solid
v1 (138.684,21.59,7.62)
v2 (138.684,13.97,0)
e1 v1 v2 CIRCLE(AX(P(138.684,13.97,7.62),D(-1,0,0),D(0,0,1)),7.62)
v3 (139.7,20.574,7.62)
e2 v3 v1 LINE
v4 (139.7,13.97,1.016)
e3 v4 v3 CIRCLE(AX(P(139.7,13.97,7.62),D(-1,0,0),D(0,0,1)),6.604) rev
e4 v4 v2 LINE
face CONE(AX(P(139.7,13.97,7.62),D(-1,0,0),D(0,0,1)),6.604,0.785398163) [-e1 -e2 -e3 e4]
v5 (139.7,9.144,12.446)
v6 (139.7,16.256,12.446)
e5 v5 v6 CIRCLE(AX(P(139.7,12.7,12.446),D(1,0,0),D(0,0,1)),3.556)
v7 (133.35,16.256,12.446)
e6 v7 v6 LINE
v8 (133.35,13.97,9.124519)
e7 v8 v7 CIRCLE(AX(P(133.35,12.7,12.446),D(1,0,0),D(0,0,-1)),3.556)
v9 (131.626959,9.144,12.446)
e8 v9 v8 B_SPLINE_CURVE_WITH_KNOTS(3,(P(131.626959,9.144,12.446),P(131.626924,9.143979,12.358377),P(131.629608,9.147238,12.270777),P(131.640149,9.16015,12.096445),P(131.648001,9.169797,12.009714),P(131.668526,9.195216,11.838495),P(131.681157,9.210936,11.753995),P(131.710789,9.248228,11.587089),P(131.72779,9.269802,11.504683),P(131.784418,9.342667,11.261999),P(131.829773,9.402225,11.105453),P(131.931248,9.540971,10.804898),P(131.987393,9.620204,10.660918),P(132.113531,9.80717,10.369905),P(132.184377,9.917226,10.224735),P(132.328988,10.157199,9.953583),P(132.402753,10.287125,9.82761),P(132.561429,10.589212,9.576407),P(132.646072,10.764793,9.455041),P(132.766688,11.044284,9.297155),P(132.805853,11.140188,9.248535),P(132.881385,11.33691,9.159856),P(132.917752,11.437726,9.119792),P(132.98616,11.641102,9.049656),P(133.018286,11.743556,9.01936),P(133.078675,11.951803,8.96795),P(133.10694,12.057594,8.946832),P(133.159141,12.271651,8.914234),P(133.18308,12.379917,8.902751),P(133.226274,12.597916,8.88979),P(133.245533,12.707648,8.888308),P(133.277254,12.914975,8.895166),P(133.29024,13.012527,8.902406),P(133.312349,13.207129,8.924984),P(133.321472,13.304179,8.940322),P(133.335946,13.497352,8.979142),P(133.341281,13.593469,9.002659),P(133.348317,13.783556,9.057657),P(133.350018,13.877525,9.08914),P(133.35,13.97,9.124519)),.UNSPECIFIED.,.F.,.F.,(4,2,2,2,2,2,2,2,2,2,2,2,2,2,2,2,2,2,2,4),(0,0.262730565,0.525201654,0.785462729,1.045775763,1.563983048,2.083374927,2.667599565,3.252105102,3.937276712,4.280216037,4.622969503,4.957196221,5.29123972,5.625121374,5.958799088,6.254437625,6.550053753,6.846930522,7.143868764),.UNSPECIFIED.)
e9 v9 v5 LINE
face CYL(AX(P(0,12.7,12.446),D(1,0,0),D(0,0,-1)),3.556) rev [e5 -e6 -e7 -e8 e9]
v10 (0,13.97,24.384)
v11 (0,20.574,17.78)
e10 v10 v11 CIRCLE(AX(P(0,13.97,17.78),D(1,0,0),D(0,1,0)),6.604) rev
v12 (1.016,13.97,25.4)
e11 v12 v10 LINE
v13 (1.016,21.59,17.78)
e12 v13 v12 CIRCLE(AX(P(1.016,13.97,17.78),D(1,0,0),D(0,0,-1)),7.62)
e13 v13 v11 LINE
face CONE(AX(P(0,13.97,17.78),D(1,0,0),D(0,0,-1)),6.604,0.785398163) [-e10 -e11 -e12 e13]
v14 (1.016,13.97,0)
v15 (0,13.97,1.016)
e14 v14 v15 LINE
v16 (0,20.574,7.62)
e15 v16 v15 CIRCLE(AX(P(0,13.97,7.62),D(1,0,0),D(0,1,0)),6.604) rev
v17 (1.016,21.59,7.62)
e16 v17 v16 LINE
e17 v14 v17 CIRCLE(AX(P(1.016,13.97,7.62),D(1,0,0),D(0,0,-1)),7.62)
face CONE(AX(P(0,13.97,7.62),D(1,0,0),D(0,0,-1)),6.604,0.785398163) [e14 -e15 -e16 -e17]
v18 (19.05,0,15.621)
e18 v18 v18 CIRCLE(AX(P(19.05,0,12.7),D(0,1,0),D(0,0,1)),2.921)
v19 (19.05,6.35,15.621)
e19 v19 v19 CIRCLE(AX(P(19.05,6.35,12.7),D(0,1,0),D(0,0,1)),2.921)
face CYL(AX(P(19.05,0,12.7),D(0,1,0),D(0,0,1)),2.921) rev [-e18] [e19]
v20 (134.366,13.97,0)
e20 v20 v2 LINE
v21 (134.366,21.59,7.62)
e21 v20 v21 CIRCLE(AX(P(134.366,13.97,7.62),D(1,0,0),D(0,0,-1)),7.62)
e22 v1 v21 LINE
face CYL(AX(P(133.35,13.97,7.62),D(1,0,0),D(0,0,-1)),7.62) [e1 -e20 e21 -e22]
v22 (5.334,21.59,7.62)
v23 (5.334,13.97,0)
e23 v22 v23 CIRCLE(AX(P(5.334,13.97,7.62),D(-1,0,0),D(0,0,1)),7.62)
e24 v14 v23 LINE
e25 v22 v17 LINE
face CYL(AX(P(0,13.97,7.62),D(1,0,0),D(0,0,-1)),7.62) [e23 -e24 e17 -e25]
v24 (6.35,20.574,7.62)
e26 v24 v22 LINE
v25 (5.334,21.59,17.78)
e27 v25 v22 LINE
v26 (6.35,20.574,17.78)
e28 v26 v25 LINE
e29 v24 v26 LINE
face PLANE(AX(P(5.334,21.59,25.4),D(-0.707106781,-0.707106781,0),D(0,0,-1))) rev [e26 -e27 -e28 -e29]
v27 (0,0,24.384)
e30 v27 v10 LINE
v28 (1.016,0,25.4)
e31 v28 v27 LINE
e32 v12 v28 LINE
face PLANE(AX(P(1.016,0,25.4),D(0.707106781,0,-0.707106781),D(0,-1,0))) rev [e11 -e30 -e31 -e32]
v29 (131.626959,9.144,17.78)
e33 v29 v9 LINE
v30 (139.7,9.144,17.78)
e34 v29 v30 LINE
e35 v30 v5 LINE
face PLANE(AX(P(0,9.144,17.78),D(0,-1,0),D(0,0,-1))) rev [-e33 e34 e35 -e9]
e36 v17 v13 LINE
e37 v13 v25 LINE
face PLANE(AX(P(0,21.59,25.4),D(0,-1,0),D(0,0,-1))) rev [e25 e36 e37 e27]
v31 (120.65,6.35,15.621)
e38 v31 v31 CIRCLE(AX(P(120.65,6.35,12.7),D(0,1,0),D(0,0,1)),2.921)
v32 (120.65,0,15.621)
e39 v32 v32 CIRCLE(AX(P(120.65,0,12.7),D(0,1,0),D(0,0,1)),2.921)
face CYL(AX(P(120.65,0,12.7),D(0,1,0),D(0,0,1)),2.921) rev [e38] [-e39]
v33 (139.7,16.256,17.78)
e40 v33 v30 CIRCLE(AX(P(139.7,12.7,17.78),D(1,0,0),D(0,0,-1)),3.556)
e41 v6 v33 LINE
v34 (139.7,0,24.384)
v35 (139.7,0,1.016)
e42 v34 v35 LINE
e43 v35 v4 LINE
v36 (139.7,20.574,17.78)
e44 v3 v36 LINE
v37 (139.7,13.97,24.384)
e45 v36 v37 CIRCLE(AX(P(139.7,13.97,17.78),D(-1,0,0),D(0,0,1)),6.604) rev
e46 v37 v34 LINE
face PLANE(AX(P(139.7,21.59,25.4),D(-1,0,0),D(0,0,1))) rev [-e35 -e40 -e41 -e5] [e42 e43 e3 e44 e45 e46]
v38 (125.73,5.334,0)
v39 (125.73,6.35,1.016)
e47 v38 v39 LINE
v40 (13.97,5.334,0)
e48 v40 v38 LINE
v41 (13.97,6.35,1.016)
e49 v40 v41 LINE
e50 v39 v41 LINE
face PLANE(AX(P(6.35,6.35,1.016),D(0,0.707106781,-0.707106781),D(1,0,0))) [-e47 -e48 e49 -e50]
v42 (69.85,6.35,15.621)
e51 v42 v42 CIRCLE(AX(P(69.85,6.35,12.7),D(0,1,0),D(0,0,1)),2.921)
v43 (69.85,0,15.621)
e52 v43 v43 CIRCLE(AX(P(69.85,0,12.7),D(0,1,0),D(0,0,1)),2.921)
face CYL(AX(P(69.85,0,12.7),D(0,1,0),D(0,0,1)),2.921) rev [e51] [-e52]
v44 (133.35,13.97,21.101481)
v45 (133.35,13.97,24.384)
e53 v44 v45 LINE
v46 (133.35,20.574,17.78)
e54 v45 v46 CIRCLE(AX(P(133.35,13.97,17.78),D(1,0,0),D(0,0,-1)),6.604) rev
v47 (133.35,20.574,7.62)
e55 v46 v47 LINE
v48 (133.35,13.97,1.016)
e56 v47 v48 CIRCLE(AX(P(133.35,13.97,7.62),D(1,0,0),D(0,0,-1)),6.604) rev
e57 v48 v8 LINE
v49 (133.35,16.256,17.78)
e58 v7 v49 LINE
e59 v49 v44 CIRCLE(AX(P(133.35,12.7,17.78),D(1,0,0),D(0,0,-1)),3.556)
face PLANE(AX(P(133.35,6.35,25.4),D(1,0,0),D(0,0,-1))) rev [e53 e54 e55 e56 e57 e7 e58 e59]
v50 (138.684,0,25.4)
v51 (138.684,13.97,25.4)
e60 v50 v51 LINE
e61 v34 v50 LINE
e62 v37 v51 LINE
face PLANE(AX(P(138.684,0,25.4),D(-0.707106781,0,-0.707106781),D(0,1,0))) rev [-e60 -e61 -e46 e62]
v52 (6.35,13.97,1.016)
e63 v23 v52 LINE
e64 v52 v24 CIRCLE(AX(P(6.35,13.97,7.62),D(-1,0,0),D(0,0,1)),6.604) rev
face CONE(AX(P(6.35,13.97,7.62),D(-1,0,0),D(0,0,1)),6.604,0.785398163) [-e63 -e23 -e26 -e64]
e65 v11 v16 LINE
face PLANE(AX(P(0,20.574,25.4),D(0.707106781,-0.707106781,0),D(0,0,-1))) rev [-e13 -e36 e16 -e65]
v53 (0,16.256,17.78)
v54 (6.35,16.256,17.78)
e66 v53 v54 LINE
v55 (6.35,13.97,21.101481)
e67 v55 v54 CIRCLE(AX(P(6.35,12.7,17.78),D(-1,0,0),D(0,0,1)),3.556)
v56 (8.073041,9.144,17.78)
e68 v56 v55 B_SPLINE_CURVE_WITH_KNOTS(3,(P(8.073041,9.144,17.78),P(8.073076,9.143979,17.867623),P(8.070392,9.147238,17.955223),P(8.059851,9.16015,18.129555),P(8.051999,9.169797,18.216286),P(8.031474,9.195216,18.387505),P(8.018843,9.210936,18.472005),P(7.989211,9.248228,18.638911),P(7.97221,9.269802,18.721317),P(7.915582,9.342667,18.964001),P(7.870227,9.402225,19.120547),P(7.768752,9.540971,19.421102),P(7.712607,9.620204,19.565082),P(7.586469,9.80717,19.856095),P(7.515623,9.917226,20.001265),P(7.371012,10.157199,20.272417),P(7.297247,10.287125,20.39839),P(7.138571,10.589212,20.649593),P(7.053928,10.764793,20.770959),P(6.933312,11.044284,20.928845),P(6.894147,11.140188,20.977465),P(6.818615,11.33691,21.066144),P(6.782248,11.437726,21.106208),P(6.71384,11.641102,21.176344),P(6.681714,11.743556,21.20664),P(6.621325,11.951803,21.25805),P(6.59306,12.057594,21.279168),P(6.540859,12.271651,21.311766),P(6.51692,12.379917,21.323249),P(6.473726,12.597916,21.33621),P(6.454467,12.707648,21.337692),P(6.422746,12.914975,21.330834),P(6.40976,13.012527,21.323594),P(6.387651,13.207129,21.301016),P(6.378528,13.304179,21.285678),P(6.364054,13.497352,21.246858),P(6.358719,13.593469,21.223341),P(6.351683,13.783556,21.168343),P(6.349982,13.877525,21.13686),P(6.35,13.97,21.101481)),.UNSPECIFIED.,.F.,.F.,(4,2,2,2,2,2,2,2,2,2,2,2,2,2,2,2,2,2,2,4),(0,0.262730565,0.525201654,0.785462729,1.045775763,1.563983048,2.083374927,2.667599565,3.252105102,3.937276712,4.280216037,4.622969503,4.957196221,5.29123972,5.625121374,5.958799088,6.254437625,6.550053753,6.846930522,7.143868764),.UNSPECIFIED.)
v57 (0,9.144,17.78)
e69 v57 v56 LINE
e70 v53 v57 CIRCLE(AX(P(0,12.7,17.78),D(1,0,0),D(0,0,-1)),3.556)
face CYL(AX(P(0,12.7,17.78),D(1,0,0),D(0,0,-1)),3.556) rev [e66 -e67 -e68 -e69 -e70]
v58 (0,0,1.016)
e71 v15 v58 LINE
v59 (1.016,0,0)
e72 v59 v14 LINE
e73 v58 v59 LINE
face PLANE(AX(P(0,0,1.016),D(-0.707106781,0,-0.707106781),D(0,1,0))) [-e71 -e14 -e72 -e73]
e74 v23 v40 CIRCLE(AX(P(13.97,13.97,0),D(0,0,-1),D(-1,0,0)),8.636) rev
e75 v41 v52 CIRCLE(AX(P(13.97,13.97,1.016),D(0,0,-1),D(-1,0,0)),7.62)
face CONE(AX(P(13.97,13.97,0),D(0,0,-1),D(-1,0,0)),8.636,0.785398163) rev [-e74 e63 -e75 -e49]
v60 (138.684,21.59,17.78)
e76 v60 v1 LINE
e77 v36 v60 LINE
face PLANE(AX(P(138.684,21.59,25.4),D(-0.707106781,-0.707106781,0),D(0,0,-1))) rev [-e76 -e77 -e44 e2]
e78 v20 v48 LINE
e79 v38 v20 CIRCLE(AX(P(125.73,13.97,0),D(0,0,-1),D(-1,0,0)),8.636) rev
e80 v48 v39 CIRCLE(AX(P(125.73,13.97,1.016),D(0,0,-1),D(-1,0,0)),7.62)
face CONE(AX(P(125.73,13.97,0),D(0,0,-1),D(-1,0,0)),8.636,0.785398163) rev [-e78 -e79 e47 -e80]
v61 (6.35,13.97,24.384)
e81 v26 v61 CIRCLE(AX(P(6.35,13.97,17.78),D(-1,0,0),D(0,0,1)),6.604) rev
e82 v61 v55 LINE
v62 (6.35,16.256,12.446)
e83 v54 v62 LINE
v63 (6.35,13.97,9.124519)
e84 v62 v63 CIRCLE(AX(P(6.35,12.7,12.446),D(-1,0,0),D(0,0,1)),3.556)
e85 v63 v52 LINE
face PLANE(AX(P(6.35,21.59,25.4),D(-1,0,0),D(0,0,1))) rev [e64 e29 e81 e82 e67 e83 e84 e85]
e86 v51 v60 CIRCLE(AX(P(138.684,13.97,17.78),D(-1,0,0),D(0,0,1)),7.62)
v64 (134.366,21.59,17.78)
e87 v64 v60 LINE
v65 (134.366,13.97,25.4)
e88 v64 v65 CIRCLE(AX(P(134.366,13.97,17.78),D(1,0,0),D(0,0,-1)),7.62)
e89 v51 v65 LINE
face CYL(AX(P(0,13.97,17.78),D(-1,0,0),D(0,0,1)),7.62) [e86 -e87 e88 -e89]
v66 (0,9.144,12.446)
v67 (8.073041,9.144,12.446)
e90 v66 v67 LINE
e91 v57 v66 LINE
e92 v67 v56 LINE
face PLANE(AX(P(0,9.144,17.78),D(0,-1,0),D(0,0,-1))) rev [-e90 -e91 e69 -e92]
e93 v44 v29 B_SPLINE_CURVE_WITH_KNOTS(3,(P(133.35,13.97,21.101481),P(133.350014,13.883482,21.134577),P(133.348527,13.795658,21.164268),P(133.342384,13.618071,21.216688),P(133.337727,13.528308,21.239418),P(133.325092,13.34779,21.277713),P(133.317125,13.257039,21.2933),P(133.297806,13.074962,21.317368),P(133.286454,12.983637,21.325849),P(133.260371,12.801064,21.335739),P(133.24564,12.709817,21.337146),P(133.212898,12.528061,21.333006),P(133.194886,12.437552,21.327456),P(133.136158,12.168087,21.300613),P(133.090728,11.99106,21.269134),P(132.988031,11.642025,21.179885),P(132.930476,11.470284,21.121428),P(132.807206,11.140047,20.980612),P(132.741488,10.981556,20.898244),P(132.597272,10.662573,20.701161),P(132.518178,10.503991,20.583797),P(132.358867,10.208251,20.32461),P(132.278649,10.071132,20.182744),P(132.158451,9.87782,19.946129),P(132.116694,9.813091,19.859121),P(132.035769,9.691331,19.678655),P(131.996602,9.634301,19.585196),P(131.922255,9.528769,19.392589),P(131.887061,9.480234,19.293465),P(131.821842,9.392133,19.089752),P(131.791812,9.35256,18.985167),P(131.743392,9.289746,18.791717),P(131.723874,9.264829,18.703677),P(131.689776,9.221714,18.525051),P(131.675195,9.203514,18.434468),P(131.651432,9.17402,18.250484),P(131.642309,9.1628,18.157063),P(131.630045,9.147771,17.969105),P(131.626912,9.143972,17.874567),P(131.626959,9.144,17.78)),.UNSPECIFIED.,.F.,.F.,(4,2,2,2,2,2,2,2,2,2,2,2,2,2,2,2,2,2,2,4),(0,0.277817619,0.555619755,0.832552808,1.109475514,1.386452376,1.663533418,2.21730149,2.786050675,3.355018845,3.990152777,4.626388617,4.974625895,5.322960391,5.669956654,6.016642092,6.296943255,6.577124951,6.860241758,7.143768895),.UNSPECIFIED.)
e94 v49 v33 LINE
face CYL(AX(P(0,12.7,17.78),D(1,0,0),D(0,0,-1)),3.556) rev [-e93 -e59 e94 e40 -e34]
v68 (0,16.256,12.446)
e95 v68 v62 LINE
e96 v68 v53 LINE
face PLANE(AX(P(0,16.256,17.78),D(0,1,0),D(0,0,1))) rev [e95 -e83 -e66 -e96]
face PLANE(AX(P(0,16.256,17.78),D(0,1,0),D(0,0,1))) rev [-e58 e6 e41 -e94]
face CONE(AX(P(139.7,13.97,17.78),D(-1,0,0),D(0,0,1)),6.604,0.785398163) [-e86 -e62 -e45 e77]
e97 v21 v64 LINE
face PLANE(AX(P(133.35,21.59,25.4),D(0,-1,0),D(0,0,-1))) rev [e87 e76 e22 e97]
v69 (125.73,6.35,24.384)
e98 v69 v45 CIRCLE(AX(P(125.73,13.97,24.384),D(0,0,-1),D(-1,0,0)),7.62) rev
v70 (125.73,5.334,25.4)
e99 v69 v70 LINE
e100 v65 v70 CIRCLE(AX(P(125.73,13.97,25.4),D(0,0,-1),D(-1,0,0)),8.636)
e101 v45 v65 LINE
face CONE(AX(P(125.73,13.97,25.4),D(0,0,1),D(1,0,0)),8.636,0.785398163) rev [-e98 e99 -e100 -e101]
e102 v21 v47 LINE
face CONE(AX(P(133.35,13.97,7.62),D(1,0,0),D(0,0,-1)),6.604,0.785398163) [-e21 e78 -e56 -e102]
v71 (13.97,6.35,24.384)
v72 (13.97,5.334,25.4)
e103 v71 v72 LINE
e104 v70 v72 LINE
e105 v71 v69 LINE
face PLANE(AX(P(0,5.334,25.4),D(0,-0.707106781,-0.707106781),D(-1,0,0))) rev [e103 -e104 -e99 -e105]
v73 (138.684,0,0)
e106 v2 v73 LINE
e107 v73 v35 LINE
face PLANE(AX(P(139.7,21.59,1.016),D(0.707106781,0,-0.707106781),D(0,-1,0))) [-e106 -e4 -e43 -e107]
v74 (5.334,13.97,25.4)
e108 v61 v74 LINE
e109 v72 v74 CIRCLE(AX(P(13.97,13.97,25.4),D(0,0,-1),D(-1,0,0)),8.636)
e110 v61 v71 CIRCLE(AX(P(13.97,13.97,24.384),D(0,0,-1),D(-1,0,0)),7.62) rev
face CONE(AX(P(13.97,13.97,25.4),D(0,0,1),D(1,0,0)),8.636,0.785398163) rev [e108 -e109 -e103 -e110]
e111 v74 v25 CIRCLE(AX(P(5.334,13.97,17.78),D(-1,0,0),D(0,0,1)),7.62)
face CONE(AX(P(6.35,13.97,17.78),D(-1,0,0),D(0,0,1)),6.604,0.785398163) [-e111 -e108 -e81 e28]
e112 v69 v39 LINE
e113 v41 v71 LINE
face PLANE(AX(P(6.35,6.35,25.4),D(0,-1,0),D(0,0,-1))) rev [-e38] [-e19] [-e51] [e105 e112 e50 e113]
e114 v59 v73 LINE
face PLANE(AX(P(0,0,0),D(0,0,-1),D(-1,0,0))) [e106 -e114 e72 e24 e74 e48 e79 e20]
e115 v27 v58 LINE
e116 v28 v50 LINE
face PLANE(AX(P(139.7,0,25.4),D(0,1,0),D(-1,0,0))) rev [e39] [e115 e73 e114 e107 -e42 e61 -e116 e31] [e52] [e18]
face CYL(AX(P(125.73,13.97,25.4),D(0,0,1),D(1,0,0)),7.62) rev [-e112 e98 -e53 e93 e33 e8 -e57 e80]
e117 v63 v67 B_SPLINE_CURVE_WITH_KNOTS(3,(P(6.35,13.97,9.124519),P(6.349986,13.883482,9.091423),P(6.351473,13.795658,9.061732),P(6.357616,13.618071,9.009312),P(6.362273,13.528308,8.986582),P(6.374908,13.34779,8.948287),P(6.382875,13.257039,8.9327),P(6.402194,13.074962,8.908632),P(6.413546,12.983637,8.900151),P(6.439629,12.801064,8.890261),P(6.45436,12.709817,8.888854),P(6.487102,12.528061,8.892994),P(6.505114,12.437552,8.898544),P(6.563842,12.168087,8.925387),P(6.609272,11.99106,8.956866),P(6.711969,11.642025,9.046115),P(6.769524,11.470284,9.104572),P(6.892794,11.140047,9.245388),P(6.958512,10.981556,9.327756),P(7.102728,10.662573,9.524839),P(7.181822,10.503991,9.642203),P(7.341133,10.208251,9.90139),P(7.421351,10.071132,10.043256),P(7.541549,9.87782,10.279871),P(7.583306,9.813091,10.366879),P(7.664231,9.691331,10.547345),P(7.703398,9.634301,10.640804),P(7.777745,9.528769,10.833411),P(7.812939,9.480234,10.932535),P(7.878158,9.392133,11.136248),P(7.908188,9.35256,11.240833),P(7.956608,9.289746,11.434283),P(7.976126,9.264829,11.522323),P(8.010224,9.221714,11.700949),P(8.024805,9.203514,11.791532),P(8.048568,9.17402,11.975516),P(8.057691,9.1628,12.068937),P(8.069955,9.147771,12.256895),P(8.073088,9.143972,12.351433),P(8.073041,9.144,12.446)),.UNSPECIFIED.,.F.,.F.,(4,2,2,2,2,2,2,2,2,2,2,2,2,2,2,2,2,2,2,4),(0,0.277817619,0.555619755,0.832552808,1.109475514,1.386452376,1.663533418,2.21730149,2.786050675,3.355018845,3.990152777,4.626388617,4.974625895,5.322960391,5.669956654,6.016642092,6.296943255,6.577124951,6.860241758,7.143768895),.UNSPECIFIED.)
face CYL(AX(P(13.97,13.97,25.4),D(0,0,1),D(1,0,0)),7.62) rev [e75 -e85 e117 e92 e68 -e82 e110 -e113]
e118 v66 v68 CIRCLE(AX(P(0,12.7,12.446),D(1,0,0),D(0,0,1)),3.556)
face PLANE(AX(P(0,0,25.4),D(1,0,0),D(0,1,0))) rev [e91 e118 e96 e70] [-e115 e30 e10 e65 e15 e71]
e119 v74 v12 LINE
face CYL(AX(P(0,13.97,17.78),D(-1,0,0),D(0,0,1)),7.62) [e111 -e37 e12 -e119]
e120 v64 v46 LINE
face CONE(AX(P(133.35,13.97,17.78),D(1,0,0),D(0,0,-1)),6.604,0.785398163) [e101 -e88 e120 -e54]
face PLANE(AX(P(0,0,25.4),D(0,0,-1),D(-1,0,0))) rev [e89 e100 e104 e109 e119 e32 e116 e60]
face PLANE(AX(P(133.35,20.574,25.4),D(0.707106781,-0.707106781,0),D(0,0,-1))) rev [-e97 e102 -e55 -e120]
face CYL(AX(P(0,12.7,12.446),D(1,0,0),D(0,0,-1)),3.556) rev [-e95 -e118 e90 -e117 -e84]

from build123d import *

# Parameters (mm, degrees)
BOSS_EXTRUDE1_DEPTH = 25.4
FILLET1_R           = 7.62
SKETCH2_R           = 2.921
CUT_EXTRUDE1_DEPTH  = 143.805838816
CHAMFER1_SIZE       = 1.016
CUT_EXTRUDE2_DEPTH  = 144.622345406


with BuildPart() as part:
    # Sketch1 → Boss-Extrude1 (new body)
    with BuildSketch(Plane.XY):
        Polygon((0, 0), (0, 21.59), (6.35, 21.59), (6.35, 6.35), (133.35, 6.35), (133.35, 21.59), (139.7, 21.59), (139.7, 0), align=None)
    extrude(amount=BOSS_EXTRUDE1_DEPTH)

    # Fillet1
    fillet1_edges = [part.edges().sort_by_distance(p)[0] for p in [
        (136.525, 21.59, 0),
        (136.525, 21.59, 25.4),
        (3.175, 21.59, 0),
        (3.175, 21.59, 25.4),
        (133.35, 6.35, 12.7),
        (6.35, 6.35, 12.7),
    ]]
    fillet(fillet1_edges, radius=FILLET1_R - 0.0001)  # a hair under: the kernel refuses the full size

    # Sketch2 → Cut-Extrude1 (cut, through all)
    with BuildSketch(Plane(origin=(0, 6.35, 0), x_dir=(1, 0, 0), z_dir=(0, 1, 0))):
        with Locations(Location((69.85, -12.7, 0), (0, 0, 270))):
            Circle(SKETCH2_R)
        with Locations(Location((120.65, -12.7, 0), (0, 0, 270))):
            Circle(SKETCH2_R)
        with Locations(Location((19.05, -12.7, 0), (0, 0, 270))):
            Circle(SKETCH2_R)
    extrude(amount=-CUT_EXTRUDE1_DEPTH, mode=Mode.SUBTRACT)

    # Chamfer1
    chamfer1_edges = [part.edges().sort_by_distance(p)[0] for p in [
        (139.7, 6.98505, 0),
        (133.35, 21.59, 12.7),
        (139.7, 21.59, 12.7),
        (133.35, 19.358182962, 23.168182962),
        (133.35, 19.358182962, 2.231817038),
        (0, 6.98505, 0),
        (69.85, 6.35, 0),
        (139.7, 19.358182962, 23.168182962),
        (139.7, 19.358182962, 2.231817038),
        (69.85, 6.35, 25.4),
        (0, 6.98505, 25.4),
        (0, 21.59, 12.7),
        (6.35, 21.59, 12.7),
        (0, 19.358182962, 23.168182962),
        (0, 19.358182962, 2.231817038),
        (6.35, 19.358182962, 23.168182962),
        (6.35, 19.358182962, 2.231817038),
        (131.118182962, 8.581817038, 0),
        (131.118182962, 8.581817038, 25.4),
        (8.581817038, 8.581817038, 0),
        (8.581817038, 8.581817038, 25.4),
        (139.7, 6.98505, 25.4),
    ]]
    chamfer(chamfer1_edges, length=CHAMFER1_SIZE)

    # Sketch3 → Cut-Extrude2 (cut, through all)
    with BuildSketch(Plane(origin=(139.7, 0, 0), x_dir=(0, 0, -1), z_dir=(1, 0, 0))):
        with BuildLine():
            Line((-17.78, 16.256), (-12.446, 16.256))
            ThreePointArc((-12.446, 16.256), (-8.89, 12.7), (-12.446, 9.144))
            Line((-12.446, 9.144), (-17.78, 9.144))
            ThreePointArc((-17.78, 9.144), (-21.336, 12.7), (-17.78, 16.256))
        make_face()
    extrude(amount=-CUT_EXTRUDE2_DEPTH, mode=Mode.SUBTRACT)


solid = part.part
